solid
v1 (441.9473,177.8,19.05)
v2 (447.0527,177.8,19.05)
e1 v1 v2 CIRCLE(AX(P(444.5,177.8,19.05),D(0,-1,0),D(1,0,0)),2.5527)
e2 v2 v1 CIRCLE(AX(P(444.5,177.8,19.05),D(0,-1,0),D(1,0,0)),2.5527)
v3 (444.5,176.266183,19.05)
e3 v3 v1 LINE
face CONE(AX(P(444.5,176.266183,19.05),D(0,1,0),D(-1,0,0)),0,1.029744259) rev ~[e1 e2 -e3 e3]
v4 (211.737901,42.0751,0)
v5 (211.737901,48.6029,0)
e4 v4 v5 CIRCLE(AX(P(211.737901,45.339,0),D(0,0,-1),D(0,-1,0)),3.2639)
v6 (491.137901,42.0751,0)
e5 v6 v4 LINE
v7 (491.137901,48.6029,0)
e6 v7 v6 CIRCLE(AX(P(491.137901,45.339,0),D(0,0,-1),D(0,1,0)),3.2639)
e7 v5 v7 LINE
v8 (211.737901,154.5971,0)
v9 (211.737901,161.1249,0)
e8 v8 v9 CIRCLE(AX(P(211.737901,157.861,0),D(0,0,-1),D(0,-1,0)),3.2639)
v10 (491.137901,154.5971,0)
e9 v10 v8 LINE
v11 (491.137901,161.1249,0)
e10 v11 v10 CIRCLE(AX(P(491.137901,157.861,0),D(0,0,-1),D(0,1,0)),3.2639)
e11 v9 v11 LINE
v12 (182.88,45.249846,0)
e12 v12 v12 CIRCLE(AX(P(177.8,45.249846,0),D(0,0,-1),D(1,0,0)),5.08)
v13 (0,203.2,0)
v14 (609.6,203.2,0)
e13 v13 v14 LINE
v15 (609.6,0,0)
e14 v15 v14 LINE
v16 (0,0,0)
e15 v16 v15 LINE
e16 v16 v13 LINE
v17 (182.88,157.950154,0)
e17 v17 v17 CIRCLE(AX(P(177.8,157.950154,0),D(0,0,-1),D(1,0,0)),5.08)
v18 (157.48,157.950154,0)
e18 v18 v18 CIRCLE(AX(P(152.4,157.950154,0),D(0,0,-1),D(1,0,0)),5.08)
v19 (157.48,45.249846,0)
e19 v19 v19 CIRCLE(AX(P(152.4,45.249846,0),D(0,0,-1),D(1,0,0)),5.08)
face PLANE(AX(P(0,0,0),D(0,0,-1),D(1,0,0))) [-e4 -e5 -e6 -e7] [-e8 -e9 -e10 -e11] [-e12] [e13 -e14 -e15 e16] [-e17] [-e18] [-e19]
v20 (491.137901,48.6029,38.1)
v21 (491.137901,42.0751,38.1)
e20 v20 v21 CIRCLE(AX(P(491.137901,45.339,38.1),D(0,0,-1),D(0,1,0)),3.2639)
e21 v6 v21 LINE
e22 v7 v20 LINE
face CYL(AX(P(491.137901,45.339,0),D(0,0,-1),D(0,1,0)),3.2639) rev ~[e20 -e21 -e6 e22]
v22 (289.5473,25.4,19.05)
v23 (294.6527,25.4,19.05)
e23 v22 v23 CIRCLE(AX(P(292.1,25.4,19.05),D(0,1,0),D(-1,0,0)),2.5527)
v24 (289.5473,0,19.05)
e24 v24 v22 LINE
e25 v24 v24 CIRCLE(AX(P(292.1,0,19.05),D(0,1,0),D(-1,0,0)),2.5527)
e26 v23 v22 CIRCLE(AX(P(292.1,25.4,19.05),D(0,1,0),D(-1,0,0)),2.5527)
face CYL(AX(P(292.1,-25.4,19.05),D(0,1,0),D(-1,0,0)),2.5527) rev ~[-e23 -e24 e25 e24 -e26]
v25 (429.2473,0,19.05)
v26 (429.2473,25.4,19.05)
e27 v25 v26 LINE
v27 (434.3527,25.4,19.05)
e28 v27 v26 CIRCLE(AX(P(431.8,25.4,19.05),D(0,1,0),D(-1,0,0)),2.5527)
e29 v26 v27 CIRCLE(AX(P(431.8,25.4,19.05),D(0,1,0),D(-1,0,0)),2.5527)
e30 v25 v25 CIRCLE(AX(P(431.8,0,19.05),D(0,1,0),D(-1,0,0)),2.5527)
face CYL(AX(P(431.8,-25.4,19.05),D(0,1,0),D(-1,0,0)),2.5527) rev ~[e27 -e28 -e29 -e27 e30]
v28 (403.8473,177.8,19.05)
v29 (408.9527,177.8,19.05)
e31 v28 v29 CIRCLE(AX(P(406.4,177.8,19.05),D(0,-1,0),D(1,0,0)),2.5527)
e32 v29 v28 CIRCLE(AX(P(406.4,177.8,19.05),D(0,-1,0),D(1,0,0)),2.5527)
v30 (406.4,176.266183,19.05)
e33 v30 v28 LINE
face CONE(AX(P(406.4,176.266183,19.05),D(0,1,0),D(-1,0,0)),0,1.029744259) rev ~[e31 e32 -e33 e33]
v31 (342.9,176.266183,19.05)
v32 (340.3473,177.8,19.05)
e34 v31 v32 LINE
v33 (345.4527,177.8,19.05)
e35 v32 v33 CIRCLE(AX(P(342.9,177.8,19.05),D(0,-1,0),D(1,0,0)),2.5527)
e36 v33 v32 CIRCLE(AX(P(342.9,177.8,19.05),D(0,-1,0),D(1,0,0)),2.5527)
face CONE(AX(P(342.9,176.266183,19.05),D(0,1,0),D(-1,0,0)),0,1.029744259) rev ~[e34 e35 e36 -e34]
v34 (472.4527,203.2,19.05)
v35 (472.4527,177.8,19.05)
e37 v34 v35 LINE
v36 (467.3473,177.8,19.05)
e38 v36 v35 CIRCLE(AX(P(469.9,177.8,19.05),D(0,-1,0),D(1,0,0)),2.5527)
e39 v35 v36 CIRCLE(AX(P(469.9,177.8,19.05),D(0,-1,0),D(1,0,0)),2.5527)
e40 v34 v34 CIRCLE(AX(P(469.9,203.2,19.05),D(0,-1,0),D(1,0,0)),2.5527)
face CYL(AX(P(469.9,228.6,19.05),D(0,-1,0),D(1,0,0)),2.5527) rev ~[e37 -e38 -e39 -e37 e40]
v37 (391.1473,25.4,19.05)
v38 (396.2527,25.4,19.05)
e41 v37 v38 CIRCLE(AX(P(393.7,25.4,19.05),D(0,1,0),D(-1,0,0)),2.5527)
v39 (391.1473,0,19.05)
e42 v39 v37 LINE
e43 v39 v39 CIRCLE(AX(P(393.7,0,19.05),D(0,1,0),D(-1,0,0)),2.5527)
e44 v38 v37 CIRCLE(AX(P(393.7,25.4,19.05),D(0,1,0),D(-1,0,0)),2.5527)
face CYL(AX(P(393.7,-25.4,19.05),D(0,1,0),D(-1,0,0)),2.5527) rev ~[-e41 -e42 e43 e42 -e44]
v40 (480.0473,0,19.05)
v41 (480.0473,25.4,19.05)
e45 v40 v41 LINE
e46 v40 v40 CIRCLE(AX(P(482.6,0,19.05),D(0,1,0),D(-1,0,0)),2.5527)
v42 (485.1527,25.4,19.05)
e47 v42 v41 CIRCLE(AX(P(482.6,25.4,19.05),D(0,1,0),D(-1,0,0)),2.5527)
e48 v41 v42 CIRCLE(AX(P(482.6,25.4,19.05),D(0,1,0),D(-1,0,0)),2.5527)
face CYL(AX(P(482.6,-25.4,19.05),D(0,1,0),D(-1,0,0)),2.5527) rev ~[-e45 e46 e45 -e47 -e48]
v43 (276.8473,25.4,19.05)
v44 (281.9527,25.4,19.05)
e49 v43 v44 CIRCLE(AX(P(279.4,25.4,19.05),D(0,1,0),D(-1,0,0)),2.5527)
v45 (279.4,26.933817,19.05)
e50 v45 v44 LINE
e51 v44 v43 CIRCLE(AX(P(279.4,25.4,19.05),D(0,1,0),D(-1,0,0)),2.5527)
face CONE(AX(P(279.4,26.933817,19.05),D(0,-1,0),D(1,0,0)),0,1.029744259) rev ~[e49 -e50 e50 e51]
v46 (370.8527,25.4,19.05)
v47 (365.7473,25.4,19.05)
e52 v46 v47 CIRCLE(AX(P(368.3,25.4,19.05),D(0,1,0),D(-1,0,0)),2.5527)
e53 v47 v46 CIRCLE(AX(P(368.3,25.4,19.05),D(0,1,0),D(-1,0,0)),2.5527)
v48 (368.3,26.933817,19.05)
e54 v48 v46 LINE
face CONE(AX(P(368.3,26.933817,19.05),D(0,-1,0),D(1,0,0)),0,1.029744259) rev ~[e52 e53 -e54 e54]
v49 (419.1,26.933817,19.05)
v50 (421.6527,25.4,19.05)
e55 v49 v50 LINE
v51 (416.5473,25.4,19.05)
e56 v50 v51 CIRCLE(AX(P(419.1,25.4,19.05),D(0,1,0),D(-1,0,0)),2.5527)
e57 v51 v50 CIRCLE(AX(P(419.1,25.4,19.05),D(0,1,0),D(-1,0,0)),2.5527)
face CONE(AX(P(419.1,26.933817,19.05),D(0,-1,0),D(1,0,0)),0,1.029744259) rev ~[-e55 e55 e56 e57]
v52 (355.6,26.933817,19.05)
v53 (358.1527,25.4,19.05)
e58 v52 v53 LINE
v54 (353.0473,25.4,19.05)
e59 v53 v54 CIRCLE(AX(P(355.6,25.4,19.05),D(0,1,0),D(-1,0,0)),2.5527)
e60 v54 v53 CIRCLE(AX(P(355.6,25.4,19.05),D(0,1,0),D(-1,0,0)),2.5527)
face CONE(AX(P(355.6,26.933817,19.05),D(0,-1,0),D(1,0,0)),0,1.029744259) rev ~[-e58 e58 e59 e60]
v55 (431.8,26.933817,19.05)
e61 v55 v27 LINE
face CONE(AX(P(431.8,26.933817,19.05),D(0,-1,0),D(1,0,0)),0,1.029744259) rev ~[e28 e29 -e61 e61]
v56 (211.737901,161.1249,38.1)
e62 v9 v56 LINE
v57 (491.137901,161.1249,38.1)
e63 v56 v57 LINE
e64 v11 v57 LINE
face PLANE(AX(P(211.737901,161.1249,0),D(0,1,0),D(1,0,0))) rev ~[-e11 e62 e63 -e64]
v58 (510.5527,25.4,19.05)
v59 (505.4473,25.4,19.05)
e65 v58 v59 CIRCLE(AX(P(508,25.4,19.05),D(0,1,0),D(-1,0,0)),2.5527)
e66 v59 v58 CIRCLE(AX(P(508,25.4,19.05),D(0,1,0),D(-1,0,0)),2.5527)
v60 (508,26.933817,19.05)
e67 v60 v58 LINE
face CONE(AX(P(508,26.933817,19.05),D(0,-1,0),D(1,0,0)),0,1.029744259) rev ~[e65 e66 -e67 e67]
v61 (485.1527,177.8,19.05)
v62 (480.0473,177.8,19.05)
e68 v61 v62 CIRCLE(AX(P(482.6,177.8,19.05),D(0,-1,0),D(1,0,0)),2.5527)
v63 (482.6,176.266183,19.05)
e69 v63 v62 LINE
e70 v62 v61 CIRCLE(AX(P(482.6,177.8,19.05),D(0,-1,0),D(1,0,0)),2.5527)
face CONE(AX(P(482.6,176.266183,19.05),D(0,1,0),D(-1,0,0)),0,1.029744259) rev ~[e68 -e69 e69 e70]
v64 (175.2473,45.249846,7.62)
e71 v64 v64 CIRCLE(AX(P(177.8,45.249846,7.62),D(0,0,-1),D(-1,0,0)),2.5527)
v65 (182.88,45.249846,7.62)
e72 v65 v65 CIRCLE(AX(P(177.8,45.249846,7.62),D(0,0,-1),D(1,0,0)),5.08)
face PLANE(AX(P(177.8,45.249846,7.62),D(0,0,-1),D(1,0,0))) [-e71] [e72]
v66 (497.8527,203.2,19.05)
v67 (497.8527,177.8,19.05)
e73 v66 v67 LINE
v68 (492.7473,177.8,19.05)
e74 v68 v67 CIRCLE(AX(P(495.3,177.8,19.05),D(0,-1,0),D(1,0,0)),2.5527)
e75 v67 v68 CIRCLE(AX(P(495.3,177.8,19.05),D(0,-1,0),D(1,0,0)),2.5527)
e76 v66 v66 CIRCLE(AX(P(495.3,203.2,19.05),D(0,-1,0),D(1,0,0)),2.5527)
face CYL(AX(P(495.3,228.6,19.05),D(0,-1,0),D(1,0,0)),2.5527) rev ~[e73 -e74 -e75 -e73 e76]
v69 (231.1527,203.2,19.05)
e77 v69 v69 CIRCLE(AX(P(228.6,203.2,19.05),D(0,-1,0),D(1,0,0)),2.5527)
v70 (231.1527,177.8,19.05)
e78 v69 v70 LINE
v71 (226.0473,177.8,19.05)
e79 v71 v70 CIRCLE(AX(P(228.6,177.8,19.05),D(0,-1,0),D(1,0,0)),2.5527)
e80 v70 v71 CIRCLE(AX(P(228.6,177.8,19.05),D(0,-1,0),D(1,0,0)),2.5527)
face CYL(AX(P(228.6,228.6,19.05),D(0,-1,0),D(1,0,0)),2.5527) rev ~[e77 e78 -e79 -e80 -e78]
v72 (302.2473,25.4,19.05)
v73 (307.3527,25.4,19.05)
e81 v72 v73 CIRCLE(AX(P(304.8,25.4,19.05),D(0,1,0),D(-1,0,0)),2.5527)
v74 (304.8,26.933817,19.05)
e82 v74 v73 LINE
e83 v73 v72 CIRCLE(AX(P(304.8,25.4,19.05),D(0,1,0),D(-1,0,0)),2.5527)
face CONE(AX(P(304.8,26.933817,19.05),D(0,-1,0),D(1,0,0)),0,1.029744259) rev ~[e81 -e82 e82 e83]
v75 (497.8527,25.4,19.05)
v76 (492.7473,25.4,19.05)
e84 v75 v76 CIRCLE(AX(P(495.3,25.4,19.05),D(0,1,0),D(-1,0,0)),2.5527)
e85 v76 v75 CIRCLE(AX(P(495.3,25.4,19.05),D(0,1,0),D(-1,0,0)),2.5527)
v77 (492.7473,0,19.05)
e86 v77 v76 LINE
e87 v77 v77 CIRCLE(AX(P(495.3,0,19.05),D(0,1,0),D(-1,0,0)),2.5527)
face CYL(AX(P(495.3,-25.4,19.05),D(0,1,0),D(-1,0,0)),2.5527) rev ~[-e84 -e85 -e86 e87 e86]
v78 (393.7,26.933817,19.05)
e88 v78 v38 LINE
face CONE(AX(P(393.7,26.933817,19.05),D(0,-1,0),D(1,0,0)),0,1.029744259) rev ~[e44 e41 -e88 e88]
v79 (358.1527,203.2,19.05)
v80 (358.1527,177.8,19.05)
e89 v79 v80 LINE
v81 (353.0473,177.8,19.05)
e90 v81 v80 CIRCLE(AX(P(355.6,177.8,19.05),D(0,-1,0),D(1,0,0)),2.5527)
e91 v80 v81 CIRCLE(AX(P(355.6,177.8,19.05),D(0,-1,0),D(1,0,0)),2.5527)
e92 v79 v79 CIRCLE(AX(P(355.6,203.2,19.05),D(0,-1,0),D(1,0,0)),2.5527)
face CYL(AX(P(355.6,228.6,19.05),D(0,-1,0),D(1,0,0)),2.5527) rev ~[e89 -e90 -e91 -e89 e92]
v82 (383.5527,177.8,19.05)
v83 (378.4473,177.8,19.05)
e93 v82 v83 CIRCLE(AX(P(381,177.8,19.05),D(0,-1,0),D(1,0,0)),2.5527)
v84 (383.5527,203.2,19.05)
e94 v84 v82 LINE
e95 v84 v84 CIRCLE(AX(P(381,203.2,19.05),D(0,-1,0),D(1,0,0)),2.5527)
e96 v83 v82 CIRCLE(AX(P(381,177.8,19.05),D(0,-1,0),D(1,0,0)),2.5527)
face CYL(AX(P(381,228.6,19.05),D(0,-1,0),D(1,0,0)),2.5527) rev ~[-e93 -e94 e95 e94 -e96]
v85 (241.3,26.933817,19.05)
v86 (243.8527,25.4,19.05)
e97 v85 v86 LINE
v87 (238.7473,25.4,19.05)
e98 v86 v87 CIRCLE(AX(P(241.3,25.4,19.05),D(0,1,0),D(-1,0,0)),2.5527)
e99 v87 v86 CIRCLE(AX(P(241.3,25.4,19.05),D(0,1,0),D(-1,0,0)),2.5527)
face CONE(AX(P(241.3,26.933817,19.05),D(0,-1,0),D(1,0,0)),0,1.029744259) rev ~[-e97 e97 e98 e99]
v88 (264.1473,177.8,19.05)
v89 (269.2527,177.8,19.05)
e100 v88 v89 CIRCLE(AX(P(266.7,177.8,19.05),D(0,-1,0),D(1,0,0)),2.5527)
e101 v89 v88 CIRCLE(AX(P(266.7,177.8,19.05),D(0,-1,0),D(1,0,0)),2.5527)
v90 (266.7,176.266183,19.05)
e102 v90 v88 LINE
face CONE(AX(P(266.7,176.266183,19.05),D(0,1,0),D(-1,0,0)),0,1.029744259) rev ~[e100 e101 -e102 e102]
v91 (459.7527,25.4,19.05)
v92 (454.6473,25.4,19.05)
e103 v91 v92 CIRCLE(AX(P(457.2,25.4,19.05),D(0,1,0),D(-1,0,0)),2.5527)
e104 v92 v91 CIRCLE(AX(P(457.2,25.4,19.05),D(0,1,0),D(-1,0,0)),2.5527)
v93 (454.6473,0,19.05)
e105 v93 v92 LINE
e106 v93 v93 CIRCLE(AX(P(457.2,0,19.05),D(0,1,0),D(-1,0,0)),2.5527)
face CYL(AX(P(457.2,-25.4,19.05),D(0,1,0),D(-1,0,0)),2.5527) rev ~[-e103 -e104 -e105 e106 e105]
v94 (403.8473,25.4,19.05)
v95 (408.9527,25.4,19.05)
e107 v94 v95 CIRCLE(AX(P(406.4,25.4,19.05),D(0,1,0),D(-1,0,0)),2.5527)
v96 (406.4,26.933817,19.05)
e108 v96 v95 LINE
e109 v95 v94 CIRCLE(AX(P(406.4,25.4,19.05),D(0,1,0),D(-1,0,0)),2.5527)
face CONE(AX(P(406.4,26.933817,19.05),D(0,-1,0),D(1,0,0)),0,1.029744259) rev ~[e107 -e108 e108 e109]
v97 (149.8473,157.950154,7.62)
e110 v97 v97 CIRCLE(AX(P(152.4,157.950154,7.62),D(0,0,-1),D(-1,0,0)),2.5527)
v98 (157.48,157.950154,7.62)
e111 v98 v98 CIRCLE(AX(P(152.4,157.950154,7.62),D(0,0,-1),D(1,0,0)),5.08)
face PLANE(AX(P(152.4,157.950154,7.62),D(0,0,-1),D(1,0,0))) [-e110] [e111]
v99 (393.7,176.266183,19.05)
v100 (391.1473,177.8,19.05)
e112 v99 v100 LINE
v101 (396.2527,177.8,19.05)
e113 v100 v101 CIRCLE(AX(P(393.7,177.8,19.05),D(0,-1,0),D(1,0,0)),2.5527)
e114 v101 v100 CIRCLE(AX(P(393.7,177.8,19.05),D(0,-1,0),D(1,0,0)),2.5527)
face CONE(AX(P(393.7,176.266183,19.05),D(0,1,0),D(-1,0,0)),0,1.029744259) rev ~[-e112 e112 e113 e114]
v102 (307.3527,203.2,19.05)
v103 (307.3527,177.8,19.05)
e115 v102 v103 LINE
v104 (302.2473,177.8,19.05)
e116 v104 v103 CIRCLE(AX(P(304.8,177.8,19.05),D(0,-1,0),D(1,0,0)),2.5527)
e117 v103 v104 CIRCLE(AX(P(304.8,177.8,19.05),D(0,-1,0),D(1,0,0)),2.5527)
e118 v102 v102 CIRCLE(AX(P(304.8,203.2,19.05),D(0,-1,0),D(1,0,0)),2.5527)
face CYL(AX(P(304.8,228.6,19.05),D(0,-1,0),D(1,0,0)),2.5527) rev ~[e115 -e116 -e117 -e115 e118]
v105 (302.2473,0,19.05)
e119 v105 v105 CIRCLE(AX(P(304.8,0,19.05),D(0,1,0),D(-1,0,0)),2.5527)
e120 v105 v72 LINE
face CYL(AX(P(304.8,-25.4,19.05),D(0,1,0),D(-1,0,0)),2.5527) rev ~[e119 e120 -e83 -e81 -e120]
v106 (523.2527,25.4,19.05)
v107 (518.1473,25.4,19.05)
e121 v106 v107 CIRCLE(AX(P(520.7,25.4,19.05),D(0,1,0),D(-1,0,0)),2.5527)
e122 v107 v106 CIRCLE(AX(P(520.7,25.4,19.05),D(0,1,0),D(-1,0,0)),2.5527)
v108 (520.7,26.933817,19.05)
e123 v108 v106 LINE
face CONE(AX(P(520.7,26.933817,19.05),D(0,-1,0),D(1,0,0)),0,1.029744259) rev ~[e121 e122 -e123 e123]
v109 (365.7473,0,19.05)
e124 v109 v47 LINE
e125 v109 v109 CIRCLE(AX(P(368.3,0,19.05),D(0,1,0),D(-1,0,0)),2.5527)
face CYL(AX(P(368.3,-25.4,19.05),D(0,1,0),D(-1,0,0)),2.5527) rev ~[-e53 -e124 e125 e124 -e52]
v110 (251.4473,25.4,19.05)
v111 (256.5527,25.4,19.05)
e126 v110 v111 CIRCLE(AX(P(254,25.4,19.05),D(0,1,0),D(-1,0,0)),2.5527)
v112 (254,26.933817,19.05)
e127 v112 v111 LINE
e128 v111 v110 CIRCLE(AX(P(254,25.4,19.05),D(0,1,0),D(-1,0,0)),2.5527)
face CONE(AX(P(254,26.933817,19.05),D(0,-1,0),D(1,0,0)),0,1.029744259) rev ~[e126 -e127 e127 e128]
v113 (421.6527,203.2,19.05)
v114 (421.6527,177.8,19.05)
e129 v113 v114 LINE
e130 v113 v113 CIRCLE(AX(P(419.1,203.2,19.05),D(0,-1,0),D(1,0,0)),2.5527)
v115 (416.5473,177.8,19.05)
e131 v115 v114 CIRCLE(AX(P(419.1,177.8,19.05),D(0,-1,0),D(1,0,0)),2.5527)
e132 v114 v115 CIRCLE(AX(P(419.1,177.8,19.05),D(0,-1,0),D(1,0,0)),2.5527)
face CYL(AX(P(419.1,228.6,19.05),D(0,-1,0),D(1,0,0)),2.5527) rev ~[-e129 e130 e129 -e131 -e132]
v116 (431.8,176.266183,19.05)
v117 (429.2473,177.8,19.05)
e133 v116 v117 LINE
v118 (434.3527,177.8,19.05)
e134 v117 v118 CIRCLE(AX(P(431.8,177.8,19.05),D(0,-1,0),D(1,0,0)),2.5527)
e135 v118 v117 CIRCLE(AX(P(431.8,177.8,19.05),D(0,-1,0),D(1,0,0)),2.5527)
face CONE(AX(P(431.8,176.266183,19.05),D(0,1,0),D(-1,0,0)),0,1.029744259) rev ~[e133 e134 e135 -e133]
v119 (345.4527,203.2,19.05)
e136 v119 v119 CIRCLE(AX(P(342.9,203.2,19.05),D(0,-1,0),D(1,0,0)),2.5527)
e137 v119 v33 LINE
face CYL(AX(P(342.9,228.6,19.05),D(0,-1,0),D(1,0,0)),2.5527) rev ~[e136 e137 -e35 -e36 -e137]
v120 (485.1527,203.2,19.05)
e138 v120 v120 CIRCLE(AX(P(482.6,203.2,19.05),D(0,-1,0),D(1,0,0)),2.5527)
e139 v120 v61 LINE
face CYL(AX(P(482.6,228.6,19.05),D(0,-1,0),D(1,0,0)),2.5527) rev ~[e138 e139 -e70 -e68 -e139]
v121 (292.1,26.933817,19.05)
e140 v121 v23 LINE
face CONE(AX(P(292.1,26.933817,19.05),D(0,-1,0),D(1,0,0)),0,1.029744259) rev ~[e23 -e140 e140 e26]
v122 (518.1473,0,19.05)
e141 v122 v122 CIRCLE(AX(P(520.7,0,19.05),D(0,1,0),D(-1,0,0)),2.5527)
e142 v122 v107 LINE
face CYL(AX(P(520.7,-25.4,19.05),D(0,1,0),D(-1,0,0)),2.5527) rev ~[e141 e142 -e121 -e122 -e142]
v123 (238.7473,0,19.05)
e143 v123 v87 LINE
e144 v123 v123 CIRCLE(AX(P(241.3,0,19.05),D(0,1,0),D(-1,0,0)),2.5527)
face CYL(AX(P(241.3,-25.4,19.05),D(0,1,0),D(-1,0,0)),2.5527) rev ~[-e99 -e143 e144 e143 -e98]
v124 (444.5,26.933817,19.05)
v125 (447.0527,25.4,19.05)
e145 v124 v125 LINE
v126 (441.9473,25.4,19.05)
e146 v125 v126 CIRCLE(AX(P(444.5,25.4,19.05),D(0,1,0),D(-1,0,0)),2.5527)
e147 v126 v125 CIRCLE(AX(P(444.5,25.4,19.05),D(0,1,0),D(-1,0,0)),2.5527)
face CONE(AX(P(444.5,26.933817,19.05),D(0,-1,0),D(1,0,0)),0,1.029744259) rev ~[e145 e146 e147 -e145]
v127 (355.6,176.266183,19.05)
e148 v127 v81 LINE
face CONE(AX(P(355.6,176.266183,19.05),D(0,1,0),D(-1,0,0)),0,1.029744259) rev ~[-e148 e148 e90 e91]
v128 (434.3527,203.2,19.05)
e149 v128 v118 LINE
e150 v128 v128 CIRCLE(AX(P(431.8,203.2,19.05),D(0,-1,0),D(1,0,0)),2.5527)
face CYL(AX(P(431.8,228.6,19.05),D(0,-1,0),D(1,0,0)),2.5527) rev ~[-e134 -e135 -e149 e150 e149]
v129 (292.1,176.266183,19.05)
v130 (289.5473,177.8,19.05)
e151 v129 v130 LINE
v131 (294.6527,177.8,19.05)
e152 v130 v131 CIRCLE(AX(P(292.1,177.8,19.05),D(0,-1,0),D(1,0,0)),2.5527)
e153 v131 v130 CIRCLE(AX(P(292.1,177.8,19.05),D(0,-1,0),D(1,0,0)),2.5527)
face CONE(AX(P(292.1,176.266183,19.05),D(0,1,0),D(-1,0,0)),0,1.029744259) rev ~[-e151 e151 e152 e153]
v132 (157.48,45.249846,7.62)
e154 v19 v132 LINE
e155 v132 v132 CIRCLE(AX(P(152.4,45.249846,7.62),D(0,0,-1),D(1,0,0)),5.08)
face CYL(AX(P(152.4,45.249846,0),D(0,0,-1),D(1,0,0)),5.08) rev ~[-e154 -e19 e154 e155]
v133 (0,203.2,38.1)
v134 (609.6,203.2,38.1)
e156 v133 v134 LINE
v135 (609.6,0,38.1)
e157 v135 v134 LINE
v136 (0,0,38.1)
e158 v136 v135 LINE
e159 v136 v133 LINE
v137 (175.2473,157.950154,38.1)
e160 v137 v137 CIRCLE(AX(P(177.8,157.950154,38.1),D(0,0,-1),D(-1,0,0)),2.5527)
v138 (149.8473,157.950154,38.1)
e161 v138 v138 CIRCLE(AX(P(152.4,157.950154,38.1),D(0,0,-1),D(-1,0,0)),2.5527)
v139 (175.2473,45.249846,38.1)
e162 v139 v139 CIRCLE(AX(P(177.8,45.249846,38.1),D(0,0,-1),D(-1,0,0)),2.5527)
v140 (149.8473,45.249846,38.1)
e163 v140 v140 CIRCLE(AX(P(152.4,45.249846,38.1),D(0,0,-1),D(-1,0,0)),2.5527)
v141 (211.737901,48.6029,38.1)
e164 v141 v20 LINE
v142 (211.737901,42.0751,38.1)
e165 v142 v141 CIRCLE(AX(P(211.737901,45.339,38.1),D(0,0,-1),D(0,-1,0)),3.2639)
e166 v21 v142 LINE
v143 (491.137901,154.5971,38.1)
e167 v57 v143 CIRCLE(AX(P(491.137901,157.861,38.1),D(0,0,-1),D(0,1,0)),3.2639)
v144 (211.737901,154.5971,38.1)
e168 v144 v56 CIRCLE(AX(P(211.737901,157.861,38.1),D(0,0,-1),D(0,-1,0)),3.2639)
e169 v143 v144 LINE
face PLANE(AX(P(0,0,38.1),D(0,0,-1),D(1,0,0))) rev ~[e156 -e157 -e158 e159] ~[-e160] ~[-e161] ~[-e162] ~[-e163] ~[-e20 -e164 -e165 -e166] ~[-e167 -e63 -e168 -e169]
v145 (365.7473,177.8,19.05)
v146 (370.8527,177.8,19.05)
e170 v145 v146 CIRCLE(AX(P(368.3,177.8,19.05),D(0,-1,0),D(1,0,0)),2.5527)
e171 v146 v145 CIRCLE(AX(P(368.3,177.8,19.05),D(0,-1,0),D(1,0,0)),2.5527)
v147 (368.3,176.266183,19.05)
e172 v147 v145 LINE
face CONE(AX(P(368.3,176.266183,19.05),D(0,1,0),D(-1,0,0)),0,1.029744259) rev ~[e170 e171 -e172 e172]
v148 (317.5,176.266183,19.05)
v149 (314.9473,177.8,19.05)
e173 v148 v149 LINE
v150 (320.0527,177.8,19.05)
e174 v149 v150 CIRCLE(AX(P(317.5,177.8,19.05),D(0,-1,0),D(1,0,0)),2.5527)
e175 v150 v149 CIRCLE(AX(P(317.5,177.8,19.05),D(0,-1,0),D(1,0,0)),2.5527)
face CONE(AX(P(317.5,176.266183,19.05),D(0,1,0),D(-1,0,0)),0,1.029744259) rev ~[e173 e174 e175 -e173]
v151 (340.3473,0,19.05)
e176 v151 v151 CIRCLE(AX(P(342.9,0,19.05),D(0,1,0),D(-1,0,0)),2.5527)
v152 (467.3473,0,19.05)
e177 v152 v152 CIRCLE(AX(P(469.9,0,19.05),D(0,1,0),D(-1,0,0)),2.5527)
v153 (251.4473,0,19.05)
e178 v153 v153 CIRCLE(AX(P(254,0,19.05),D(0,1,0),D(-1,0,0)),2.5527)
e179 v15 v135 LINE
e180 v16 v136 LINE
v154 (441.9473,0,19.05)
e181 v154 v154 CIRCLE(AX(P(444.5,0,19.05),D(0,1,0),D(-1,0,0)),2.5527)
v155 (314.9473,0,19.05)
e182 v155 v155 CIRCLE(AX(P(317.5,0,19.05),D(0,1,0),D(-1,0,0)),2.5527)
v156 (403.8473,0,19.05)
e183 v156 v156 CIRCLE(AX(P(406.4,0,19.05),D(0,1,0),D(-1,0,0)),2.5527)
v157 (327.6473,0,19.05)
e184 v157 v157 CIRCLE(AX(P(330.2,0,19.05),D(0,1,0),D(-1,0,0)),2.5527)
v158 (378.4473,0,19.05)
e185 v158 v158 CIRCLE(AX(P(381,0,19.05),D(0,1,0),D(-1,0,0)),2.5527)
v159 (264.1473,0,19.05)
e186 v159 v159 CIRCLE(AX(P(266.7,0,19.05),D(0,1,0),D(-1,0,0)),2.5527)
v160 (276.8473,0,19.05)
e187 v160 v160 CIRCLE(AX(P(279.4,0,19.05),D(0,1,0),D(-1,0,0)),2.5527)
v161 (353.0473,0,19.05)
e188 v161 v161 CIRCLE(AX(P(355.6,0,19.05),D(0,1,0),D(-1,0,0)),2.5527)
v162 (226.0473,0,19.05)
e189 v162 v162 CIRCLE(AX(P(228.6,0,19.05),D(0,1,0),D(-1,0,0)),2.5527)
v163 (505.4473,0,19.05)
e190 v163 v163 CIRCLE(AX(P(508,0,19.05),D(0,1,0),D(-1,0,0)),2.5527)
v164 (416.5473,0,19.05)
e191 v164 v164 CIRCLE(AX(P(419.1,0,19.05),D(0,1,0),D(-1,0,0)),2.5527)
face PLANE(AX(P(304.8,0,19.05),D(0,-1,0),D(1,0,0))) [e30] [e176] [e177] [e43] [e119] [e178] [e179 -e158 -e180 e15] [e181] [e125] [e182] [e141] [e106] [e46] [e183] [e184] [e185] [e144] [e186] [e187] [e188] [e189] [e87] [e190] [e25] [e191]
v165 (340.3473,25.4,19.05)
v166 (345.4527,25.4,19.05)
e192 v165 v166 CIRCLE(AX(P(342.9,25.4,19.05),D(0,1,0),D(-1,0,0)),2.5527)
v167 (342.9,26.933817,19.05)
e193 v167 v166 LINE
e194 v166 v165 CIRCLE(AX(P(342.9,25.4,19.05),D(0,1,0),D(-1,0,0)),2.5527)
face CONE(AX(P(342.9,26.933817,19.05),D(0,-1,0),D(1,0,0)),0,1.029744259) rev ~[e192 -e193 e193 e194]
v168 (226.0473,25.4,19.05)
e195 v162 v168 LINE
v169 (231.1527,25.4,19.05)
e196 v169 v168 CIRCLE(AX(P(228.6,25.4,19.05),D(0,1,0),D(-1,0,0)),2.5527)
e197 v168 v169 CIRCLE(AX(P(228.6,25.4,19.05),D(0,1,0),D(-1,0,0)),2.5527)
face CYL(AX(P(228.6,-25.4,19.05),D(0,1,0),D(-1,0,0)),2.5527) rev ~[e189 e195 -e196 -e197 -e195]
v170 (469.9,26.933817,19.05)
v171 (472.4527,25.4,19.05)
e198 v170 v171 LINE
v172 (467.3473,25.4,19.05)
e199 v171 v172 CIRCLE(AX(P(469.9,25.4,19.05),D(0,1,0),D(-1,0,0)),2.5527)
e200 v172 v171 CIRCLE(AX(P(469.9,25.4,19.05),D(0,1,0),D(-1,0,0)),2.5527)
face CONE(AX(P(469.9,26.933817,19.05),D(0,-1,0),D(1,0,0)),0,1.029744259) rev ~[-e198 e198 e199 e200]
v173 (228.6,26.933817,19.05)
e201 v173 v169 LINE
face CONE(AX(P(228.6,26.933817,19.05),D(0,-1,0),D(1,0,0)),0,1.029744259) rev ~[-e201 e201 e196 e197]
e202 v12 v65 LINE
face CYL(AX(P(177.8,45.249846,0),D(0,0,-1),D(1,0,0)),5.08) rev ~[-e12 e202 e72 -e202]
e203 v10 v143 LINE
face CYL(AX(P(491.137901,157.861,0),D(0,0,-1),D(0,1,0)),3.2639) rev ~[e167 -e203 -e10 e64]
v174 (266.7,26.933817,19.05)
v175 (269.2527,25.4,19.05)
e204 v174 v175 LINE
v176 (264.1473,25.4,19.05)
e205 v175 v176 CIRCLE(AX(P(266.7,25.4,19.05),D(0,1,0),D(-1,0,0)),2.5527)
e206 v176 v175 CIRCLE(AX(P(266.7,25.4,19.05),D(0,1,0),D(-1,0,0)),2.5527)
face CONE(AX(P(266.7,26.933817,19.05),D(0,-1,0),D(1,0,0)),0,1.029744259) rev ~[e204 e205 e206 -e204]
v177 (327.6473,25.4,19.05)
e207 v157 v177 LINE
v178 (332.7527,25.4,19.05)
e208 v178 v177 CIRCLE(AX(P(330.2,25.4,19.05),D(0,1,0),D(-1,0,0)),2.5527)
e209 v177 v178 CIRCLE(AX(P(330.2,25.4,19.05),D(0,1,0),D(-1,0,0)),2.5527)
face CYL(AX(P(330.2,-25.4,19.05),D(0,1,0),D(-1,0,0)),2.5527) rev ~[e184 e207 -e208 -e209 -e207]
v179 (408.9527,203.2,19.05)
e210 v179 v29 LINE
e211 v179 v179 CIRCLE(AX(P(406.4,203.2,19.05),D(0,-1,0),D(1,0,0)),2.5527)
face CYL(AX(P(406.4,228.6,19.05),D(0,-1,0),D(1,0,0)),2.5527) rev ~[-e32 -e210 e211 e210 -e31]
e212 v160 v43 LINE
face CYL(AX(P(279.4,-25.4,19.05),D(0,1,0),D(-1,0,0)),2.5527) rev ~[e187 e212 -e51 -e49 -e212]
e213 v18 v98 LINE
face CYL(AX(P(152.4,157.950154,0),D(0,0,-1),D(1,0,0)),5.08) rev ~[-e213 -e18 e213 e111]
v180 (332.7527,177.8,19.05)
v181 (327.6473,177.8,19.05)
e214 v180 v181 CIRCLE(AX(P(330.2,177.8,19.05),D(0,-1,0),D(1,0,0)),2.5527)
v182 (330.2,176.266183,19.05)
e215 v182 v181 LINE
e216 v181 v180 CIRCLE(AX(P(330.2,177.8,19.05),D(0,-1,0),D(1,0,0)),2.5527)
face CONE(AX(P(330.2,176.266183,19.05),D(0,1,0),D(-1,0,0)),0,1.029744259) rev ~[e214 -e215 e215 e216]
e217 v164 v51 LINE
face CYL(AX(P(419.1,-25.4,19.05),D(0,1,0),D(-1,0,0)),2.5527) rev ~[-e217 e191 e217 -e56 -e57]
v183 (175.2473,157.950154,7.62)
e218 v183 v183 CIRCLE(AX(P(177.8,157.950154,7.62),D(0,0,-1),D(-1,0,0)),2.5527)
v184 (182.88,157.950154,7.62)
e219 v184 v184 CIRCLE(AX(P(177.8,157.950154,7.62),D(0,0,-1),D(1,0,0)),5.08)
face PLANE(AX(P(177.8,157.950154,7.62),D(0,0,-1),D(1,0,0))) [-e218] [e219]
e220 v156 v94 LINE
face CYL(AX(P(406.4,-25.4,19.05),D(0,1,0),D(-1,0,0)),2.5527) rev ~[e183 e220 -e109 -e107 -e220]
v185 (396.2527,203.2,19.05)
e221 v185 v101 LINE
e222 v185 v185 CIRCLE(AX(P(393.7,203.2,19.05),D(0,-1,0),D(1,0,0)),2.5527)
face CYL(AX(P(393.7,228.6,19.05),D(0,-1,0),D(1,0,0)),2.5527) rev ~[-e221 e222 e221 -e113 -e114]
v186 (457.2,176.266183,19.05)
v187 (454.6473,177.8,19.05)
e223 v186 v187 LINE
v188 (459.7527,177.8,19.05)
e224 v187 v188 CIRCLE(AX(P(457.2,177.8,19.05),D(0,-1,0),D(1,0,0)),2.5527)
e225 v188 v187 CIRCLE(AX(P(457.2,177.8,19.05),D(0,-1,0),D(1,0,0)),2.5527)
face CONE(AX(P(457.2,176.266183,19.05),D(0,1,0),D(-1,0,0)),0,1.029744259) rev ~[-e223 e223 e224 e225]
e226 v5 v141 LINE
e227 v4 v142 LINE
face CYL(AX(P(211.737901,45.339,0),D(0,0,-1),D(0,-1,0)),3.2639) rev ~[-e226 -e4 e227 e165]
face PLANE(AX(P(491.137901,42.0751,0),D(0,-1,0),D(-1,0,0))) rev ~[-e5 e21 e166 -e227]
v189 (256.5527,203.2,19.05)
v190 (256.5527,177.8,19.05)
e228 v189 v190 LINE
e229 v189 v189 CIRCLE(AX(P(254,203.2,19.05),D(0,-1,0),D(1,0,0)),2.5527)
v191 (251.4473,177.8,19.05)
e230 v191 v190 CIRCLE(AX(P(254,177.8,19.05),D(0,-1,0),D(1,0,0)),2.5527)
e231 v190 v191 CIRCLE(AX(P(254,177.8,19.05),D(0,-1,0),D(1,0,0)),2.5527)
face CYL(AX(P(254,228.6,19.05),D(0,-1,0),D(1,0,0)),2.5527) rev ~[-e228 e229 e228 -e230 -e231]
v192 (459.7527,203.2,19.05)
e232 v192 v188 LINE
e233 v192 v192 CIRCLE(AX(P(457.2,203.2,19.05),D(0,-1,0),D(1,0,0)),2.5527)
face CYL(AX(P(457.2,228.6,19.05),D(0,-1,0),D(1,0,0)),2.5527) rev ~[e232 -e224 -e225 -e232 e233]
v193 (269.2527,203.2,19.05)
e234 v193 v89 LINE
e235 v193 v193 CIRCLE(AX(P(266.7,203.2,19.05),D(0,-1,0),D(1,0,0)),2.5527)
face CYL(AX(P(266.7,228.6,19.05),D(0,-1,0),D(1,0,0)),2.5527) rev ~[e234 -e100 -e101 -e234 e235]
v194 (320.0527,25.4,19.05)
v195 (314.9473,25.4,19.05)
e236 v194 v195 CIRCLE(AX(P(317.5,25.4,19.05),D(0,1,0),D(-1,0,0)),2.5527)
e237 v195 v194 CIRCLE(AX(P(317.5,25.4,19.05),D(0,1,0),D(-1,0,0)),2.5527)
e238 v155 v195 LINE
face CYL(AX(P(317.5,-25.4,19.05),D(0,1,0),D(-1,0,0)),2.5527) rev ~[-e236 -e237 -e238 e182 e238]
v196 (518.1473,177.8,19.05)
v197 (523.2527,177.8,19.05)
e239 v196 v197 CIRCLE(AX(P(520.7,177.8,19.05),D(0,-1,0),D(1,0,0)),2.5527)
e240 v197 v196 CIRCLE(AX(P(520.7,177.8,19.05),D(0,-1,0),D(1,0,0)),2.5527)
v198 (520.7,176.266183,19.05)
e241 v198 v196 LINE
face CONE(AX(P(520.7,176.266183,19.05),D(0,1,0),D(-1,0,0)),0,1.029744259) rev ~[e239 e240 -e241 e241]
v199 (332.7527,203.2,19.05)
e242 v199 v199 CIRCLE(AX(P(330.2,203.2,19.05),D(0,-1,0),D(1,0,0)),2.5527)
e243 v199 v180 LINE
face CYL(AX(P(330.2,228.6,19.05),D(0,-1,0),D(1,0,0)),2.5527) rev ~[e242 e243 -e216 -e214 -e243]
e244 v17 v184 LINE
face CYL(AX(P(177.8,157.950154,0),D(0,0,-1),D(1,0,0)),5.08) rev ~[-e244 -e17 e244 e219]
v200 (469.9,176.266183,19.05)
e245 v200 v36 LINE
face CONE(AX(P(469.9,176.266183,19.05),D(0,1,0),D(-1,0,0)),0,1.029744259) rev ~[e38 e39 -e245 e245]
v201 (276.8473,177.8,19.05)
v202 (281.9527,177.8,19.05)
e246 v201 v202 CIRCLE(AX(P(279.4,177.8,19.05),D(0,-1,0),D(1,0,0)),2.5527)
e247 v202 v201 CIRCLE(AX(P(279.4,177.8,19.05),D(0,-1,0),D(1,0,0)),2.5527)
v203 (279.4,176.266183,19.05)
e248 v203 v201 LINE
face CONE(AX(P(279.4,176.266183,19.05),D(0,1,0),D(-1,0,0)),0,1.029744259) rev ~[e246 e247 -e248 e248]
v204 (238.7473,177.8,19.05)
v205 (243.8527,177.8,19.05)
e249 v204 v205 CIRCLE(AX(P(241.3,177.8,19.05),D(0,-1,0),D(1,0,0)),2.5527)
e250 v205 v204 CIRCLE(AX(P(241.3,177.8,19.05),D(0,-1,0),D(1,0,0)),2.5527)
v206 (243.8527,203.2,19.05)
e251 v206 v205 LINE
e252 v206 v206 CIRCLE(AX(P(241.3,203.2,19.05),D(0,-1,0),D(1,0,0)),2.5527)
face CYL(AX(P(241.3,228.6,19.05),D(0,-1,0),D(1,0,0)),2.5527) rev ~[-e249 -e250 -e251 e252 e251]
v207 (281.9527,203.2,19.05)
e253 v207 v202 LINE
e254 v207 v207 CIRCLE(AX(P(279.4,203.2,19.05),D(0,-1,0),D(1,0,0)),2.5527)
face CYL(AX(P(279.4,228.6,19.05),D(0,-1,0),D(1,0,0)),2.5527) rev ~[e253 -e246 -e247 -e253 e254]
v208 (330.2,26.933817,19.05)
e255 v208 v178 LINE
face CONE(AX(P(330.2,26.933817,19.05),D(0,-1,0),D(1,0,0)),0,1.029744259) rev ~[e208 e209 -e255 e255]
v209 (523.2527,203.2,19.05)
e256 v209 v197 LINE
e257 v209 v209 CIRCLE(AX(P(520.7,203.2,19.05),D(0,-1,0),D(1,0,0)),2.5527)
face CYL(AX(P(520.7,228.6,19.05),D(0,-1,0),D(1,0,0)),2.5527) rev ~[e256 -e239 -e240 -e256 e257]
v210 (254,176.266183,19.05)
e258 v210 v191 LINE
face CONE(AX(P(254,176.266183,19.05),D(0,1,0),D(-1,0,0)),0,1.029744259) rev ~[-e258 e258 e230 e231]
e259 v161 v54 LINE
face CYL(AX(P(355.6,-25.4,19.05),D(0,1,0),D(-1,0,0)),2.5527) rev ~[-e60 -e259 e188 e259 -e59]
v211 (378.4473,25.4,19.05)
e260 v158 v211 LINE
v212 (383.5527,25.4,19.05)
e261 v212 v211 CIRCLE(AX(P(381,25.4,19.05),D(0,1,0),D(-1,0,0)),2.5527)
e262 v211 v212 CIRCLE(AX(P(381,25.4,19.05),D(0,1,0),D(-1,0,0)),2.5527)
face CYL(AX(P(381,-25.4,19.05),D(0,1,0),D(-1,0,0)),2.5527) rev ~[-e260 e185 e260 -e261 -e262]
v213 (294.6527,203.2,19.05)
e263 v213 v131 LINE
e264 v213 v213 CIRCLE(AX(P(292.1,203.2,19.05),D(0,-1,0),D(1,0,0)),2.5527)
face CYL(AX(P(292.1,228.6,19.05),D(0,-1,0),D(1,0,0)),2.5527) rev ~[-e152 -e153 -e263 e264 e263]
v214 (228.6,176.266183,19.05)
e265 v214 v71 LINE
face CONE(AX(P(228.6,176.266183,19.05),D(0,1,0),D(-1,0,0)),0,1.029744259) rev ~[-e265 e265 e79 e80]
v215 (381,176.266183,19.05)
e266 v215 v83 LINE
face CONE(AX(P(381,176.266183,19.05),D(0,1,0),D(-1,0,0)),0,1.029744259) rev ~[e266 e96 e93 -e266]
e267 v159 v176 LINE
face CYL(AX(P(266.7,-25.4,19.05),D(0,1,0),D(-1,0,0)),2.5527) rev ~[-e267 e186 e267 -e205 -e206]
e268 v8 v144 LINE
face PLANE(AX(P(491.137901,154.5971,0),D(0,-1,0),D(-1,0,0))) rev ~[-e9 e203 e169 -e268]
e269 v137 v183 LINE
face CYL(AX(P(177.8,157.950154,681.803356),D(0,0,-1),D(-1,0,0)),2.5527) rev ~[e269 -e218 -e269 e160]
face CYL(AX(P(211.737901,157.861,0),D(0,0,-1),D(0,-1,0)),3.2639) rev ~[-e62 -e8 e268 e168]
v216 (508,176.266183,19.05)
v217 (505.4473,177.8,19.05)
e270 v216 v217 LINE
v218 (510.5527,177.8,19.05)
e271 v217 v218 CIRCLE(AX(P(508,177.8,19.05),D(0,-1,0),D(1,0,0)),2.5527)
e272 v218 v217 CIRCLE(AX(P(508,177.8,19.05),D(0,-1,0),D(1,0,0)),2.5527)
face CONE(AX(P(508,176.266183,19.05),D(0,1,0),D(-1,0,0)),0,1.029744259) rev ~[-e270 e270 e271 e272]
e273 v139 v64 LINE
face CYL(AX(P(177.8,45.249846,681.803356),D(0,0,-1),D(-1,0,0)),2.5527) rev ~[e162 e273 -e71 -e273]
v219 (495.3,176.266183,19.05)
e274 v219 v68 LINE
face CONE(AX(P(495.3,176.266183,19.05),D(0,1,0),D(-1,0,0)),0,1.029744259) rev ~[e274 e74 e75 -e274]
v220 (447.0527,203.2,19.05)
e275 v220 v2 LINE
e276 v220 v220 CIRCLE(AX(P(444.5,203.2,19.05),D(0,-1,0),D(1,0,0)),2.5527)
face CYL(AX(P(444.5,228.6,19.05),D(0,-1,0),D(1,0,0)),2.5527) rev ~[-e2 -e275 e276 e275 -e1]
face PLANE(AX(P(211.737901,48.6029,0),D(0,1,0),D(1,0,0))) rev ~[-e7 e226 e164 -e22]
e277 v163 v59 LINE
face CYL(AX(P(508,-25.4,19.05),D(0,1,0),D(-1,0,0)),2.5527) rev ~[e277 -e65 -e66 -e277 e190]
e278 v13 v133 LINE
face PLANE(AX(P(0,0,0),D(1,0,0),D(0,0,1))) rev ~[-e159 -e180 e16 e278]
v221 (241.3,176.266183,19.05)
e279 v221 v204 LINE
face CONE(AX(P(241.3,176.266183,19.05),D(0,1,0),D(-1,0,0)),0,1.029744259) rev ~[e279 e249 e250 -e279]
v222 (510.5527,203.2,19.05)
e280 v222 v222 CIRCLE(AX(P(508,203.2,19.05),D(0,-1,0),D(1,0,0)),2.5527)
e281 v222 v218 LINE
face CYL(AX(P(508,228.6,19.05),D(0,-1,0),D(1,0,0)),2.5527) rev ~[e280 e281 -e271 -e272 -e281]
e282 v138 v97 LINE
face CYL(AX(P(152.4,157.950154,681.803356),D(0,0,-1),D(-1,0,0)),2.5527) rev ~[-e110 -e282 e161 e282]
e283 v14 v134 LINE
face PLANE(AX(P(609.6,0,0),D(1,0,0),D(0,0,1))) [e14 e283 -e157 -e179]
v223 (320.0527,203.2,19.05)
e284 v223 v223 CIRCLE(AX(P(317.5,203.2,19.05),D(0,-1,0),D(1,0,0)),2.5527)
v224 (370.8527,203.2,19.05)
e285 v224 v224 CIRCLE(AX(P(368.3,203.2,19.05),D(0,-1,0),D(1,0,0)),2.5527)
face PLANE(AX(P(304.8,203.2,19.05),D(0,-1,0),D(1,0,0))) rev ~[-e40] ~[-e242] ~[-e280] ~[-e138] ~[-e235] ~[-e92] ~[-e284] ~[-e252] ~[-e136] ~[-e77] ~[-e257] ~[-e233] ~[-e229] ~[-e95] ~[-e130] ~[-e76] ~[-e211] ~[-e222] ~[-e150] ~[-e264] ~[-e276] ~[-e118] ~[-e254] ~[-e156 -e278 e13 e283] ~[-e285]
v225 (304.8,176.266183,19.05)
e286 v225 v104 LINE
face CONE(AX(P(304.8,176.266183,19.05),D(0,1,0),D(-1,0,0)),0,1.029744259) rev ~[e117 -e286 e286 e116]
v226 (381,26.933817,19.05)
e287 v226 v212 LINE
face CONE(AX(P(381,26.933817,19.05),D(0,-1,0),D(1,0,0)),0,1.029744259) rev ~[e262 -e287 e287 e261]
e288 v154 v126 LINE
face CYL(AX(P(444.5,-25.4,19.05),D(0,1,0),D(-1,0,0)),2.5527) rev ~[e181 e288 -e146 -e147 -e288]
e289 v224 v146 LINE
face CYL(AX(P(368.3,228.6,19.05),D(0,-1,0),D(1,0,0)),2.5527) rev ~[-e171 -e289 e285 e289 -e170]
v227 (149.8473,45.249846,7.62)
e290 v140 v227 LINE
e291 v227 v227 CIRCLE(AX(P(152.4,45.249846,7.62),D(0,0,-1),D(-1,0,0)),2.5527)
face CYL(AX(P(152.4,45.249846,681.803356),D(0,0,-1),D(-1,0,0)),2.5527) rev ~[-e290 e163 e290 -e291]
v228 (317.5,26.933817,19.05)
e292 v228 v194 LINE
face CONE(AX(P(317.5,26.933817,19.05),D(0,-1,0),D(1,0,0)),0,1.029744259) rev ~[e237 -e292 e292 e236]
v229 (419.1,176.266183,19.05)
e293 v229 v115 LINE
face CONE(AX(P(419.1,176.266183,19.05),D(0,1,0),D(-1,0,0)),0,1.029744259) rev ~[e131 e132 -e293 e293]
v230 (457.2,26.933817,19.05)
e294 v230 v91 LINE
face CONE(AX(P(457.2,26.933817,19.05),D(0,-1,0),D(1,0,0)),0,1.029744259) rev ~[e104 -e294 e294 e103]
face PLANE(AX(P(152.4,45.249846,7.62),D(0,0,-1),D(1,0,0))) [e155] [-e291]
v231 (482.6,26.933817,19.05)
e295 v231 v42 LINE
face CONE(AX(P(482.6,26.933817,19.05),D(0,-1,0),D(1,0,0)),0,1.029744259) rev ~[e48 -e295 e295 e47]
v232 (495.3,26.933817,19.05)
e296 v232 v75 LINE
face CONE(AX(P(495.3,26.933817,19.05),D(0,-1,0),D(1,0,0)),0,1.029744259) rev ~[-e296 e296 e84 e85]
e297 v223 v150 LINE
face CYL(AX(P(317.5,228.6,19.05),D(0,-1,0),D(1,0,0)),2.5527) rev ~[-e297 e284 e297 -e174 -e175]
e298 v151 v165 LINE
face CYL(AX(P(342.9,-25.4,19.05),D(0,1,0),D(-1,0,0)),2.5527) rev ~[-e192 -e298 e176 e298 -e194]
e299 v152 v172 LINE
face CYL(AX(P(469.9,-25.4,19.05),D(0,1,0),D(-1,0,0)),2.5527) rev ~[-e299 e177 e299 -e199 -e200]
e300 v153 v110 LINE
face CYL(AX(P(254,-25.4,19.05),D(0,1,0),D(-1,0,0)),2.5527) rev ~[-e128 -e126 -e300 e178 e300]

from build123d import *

# Parameters (mm, degrees)
F0_W      = 609.6
F0_H      = 38.1
F1_DEPTH  = 203.2
F3_D      = 5.1054
F5_D      = 5.1054
F5_DEPTH  = 25.4
F5_TIP    = 1.5338169022
F7_D      = 5.1054
F7_DEPTH  = 25.4
F7_TIP    = 1.5338169022
F8_R      = 5.08
F9_DEPTH  = 7.62
F12_DEPTH = 38.101


# Not quite as in the source:
# - the program builds the solid bodies; features that only make, move or delete a surface that nothing else refers to are left out


with BuildPart() as f1:
    # F0 (on Front) → F1 (new body)
    with BuildSketch(Plane.XZ):
        with Locations((304.8, 19.05)):
            Rectangle(F0_W, F0_H)
    extrude(amount=-F1_DEPTH)

    # F3 (through all)
    with Locations(Plane.XY.offset(38.1)):
        with Locations((152.4, 157.950154), (177.8, 157.950154), (152.4, 45.249846), (177.8, 45.249846)):
            Hole(F3_D / 2)

    # F5
    with Locations(Plane.XZ):
        with Locations((228.6, 19.05), (241.3, 19.05), (254, 19.05), (266.7, 19.05), (279.4, 19.05), (292.1, 19.05), (304.8, 19.05), (317.5, 19.05), (330.2, 19.05), (342.9, 19.05), (355.6, 19.05), (368.3, 19.05), (381, 19.05), (393.7, 19.05), (406.4, 19.05), (419.1, 19.05), (431.8, 19.05), (444.5, 19.05), (457.2, 19.05), (469.9, 19.05), (482.6, 19.05), (495.3, 19.05), (508, 19.05), (520.7, 19.05)):
            Hole(F5_D / 2, depth=F5_DEPTH)
            with Locations((0, 0, -(F5_DEPTH + F5_TIP / 2))):  # 118° drill point
                Cone(0, F5_D / 2, F5_TIP, mode=Mode.SUBTRACT)

    # F7
    with Locations(Plane(origin=(0, 203.2, 0), x_dir=(-1, 0, 0), z_dir=(0, 1, 0))):
        with Locations((-228.6, 19.05), (-241.3, 19.05), (-254, 19.05), (-266.7, 19.05), (-279.4, 19.05), (-292.1, 19.05), (-304.8, 19.05), (-317.5, 19.05), (-330.2, 19.05), (-342.9, 19.05), (-355.6, 19.05), (-368.3, 19.05), (-381, 19.05), (-393.7, 19.05), (-406.4, 19.05), (-419.1, 19.05), (-431.8, 19.05), (-444.5, 19.05), (-457.2, 19.05), (-469.9, 19.05), (-482.6, 19.05), (-495.3, 19.05), (-508, 19.05), (-520.7, 19.05)):
            Hole(F7_D / 2, depth=F7_DEPTH)
            with Locations((0, 0, -(F7_DEPTH + F7_TIP / 2))):  # 118° drill point
                Cone(0, F7_D / 2, F7_TIP, mode=Mode.SUBTRACT)

    # F8 (on face) → F9 (cut)
    with BuildSketch(Plane(origin=(0, 0, 0), x_dir=(1, 0, 0), z_dir=(0, 0, -1))):
        with Locations((177.8, -157.950154)):
            Circle(F8_R)
        with Locations((152.4, -157.950154)):
            Circle(F8_R)
        with Locations((177.8, -45.249846)):
            Circle(F8_R)
        with Locations((152.4, -45.249846)):
            Circle(F8_R)
    extrude(amount=-F9_DEPTH, mode=Mode.SUBTRACT)

    # F11 (on face) → F12 (cut, through all)
    with BuildSketch(Plane(origin=(0, 0, 0), x_dir=(1, 0, 0), z_dir=(0, 0, -1))):
        with BuildLine():
            ThreePointArc((211.7379009724, -154.5971), (208.4740009724, -157.861), (211.7379009724, -161.1249))
            Line((211.7379009724, -161.1249), (491.1379009724, -161.1249))
            ThreePointArc((491.1379009724, -161.1249), (494.4018009724, -157.861), (491.1379009724, -154.5971))
            Line((491.1379009724, -154.5971), (211.7379009724, -154.5971))
        make_face()
        with BuildLine():
            ThreePointArc((211.7379009724, -42.0751), (208.4740009724, -45.339), (211.7379009724, -48.6029))
            Line((211.7379009724, -48.6029), (491.1379009724, -48.6029))
            ThreePointArc((491.1379009724, -48.6029), (494.4018009724, -45.339), (491.1379009724, -42.0751))
            Line((491.1379009724, -42.0751), (211.7379009724, -42.0751))
        make_face()
    extrude(amount=-F12_DEPTH, mode=Mode.SUBTRACT)


solid = f1.part
